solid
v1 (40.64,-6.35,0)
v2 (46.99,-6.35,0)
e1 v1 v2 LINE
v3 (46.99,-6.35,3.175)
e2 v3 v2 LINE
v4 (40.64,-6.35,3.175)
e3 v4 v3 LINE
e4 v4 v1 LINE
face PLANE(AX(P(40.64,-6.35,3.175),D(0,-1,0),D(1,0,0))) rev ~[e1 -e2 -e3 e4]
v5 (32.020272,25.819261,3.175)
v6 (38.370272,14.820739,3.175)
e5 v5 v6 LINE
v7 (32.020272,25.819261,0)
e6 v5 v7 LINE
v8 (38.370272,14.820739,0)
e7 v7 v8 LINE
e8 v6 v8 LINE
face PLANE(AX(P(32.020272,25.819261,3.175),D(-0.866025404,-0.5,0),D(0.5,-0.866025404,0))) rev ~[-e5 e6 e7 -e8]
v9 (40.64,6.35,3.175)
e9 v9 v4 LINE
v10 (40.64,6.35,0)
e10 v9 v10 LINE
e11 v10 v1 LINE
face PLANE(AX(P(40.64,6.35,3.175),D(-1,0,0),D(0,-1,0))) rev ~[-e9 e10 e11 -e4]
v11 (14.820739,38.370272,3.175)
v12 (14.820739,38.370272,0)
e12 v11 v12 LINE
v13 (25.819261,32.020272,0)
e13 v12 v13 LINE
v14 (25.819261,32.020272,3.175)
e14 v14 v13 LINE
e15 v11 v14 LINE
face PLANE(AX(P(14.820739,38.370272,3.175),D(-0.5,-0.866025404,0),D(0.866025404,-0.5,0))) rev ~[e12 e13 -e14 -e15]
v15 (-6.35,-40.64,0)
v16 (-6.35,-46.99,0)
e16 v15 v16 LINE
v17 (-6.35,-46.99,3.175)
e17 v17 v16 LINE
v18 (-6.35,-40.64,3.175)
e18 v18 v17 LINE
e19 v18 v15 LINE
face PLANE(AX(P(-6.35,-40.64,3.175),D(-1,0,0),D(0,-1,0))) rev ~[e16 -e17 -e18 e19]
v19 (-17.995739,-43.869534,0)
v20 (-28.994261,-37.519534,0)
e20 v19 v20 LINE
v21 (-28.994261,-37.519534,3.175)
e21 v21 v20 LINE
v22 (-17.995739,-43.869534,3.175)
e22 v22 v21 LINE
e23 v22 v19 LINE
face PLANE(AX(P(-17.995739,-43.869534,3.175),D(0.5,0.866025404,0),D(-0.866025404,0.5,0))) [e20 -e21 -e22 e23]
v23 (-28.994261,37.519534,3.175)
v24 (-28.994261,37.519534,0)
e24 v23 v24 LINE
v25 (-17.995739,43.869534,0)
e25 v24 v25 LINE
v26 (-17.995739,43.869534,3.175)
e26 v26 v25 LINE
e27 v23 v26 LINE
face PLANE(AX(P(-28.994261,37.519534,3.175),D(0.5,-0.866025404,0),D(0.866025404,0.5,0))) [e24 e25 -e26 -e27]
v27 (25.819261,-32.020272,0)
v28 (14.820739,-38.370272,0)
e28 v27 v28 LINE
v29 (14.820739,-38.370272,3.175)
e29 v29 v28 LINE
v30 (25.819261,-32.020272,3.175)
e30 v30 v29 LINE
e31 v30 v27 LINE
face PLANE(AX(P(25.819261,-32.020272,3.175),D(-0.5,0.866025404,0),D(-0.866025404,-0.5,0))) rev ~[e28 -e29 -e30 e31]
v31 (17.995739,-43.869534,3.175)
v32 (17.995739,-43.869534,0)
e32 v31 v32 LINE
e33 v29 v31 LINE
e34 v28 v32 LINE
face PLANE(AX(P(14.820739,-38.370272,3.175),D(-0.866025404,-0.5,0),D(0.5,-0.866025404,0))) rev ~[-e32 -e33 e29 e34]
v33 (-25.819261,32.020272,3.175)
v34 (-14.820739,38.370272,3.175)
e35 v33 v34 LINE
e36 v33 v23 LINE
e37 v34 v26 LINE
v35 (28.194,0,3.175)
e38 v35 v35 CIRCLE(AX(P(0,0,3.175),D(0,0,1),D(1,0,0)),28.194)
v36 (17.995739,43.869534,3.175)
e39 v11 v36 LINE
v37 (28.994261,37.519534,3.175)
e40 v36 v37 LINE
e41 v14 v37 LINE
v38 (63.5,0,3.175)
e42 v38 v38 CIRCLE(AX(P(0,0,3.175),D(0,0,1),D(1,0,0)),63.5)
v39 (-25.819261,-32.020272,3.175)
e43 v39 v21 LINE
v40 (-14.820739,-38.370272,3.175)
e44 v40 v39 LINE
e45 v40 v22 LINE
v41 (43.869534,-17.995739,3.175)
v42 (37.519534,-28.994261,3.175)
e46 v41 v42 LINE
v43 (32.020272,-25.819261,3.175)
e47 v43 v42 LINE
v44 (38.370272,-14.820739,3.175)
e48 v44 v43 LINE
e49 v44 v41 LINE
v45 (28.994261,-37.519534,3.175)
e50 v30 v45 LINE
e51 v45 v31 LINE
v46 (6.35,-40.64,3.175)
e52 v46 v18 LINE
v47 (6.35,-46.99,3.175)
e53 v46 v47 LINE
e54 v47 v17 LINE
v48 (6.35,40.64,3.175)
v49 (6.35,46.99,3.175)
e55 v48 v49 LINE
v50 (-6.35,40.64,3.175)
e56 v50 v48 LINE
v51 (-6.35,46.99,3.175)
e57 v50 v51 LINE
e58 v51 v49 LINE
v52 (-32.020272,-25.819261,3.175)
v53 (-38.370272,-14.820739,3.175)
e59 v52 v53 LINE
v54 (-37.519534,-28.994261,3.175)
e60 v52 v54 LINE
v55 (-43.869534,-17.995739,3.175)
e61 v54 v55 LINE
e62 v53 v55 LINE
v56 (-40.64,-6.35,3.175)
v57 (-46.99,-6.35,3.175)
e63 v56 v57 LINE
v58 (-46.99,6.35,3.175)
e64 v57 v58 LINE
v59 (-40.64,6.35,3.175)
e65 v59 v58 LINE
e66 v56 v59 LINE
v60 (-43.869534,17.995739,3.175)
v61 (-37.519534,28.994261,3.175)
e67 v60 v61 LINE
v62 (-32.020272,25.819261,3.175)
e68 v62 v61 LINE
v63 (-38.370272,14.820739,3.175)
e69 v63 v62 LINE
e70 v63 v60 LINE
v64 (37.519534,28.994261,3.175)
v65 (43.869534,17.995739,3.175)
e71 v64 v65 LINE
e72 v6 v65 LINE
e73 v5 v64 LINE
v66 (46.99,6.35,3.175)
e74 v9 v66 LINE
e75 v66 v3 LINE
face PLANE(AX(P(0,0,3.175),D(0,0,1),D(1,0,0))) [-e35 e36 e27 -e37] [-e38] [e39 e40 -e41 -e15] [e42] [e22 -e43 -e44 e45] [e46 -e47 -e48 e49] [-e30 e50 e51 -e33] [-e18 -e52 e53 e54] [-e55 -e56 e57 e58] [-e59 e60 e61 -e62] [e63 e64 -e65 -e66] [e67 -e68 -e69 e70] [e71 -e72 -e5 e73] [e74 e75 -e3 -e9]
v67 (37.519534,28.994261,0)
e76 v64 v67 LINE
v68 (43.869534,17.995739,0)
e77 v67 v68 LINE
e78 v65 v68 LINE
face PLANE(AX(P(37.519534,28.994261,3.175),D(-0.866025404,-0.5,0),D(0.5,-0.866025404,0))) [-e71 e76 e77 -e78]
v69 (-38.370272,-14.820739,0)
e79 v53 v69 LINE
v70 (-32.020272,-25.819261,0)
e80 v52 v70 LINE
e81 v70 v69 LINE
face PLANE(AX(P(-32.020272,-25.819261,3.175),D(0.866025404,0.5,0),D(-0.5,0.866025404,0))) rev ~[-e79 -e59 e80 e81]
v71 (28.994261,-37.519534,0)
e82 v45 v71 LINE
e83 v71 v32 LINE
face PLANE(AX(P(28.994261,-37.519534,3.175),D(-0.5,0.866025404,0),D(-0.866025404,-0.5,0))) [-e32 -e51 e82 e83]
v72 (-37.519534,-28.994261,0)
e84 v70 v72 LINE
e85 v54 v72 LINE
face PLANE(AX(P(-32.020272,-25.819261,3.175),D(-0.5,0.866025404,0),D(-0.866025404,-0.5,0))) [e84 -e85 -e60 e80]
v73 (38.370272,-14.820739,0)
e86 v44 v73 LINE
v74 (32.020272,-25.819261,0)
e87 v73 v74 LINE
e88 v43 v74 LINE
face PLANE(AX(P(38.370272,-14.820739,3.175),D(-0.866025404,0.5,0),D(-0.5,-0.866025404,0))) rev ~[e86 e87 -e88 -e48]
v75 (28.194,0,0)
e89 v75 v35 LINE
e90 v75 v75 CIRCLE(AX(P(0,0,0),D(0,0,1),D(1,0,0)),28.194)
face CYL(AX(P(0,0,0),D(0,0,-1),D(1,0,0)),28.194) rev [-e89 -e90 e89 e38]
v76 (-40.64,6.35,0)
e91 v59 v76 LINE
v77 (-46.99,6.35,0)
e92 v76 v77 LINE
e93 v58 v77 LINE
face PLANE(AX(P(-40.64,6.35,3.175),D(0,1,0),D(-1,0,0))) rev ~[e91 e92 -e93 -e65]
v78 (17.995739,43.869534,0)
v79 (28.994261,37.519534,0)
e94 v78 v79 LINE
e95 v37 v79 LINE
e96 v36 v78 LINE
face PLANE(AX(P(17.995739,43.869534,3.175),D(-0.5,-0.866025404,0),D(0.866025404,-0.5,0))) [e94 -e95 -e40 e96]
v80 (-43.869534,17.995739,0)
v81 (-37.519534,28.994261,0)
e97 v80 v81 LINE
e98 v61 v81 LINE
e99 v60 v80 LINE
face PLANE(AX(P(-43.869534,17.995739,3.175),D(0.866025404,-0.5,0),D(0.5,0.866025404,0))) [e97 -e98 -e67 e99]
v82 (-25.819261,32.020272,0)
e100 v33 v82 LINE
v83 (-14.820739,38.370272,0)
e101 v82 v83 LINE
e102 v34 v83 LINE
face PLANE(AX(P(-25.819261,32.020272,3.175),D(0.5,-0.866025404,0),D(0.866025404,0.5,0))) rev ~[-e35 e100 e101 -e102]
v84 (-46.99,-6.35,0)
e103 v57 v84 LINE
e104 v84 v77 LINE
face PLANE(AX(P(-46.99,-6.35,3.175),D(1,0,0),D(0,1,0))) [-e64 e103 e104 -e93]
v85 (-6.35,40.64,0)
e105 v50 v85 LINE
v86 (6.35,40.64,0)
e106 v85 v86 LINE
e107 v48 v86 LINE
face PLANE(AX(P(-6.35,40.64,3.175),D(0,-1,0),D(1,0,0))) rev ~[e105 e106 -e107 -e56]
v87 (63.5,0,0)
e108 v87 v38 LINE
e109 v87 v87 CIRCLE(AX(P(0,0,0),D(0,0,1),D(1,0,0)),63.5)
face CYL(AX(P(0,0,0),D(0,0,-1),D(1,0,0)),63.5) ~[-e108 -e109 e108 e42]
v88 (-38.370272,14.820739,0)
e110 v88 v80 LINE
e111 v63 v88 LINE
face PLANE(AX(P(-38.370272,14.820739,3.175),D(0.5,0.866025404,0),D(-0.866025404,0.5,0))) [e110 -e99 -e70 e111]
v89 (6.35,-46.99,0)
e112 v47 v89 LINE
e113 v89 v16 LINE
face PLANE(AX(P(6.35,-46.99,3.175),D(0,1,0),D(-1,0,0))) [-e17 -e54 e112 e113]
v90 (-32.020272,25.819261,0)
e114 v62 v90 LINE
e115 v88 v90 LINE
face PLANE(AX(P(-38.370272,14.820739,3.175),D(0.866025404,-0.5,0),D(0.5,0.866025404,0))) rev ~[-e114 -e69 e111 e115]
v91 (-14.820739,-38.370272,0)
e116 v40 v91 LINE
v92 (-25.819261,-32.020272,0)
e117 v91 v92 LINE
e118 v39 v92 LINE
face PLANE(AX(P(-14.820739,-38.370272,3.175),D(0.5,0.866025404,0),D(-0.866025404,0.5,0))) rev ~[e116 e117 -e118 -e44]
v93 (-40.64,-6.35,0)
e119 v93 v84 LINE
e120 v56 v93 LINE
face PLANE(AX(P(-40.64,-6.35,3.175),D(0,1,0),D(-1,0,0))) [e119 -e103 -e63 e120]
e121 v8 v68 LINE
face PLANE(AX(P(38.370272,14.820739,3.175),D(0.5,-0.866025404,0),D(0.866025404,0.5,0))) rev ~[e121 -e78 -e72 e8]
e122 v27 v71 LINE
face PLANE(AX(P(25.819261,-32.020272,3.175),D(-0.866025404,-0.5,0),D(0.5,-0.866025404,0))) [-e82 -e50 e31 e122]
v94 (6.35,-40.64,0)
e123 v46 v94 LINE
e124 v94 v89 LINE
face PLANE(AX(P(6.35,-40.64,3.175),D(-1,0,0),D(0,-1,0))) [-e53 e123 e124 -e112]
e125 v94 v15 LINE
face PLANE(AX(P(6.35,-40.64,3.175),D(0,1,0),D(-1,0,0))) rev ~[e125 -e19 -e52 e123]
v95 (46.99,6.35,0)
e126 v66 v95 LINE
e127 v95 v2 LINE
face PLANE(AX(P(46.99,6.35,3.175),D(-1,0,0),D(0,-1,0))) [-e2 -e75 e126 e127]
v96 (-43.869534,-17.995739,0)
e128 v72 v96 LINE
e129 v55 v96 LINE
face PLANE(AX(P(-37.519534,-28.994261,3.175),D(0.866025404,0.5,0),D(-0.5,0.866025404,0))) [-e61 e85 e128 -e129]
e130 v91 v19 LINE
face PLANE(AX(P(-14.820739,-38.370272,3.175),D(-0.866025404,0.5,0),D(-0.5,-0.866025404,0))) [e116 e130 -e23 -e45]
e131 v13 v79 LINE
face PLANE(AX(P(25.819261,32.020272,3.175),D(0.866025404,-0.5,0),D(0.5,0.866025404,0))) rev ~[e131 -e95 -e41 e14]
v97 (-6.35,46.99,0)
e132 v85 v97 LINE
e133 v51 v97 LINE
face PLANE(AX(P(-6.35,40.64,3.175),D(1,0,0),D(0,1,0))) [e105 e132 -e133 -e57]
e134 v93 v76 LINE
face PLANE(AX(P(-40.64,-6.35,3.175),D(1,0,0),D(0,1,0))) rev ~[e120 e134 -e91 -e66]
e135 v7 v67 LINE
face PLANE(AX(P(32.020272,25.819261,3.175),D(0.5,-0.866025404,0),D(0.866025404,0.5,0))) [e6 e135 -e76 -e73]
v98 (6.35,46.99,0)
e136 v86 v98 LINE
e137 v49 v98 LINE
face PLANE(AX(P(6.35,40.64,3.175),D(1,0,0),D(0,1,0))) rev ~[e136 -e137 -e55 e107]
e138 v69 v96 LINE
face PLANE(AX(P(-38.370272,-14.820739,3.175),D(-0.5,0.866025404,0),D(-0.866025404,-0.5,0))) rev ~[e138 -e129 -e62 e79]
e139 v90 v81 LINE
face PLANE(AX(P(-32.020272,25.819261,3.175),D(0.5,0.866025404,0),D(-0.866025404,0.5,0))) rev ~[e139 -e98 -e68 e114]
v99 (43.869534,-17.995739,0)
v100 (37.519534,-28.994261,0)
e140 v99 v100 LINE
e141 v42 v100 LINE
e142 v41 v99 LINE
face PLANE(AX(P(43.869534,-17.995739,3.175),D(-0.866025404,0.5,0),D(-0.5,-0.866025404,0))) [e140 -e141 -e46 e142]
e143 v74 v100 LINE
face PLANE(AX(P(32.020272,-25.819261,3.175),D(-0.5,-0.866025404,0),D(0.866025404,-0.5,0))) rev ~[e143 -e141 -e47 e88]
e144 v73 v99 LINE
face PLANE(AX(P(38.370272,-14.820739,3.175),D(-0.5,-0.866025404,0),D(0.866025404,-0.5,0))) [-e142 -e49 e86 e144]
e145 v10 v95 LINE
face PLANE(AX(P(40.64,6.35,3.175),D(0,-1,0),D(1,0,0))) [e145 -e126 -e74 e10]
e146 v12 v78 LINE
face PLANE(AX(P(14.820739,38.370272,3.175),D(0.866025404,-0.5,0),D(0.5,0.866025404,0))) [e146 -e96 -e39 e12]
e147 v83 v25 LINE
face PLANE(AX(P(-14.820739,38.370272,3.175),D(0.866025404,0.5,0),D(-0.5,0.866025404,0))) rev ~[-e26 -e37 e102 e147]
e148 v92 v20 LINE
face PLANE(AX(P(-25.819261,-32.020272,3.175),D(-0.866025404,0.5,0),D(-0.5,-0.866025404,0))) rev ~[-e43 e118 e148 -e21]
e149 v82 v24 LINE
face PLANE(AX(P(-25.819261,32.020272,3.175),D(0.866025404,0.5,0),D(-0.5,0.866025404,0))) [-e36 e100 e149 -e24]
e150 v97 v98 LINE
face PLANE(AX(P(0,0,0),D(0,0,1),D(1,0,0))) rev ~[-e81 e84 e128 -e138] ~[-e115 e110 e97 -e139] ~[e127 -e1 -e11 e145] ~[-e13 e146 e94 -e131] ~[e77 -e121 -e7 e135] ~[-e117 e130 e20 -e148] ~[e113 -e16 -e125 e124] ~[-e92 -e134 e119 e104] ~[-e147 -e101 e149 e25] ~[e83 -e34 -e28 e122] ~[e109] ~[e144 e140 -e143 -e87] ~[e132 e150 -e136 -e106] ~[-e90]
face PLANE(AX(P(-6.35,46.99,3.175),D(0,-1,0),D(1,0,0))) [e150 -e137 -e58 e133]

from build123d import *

# Parameters (mm, degrees)
F0_R            = 63.5
F0_R_2          = 28.194
F1_DEPTH        = 3.175
F2_W            = 12.7
F2_H            = 6.35
F3_DEPTH        = 3.176
F3_COPIES_COUNT = 12


# Not quite as in the source:
# - a pattern or mirror of a feature is missing from the dataset's text; its kind, count and spacing are read off the source's solid


with BuildPart() as f1:
    # F0 (on Top) → F1 (new body)
    with BuildSketch(Plane.XY):
        Circle(F0_R)
        Circle(F0_R_2, mode=Mode.SUBTRACT)
    extrude(amount=F1_DEPTH)

    # F2 (on face) → F3 (cut, through all)
    with BuildSketch(Plane.XY.offset(3.175)):
        with Locations((0, 43.815)):
            Rectangle(F2_W, F2_H)
    f3 = extrude(amount=-F3_DEPTH, mode=Mode.SUBTRACT)

    # F3_copies: F3 ×12 about axis
    f3_copies_axis = Axis((0, 0, 0), (0, 0, 1))
    for i in range(1, F3_COPIES_COUNT):
        add(f3.rotate(f3_copies_axis, i * 360 / F3_COPIES_COUNT), mode=Mode.SUBTRACT)


solid = f1.part
